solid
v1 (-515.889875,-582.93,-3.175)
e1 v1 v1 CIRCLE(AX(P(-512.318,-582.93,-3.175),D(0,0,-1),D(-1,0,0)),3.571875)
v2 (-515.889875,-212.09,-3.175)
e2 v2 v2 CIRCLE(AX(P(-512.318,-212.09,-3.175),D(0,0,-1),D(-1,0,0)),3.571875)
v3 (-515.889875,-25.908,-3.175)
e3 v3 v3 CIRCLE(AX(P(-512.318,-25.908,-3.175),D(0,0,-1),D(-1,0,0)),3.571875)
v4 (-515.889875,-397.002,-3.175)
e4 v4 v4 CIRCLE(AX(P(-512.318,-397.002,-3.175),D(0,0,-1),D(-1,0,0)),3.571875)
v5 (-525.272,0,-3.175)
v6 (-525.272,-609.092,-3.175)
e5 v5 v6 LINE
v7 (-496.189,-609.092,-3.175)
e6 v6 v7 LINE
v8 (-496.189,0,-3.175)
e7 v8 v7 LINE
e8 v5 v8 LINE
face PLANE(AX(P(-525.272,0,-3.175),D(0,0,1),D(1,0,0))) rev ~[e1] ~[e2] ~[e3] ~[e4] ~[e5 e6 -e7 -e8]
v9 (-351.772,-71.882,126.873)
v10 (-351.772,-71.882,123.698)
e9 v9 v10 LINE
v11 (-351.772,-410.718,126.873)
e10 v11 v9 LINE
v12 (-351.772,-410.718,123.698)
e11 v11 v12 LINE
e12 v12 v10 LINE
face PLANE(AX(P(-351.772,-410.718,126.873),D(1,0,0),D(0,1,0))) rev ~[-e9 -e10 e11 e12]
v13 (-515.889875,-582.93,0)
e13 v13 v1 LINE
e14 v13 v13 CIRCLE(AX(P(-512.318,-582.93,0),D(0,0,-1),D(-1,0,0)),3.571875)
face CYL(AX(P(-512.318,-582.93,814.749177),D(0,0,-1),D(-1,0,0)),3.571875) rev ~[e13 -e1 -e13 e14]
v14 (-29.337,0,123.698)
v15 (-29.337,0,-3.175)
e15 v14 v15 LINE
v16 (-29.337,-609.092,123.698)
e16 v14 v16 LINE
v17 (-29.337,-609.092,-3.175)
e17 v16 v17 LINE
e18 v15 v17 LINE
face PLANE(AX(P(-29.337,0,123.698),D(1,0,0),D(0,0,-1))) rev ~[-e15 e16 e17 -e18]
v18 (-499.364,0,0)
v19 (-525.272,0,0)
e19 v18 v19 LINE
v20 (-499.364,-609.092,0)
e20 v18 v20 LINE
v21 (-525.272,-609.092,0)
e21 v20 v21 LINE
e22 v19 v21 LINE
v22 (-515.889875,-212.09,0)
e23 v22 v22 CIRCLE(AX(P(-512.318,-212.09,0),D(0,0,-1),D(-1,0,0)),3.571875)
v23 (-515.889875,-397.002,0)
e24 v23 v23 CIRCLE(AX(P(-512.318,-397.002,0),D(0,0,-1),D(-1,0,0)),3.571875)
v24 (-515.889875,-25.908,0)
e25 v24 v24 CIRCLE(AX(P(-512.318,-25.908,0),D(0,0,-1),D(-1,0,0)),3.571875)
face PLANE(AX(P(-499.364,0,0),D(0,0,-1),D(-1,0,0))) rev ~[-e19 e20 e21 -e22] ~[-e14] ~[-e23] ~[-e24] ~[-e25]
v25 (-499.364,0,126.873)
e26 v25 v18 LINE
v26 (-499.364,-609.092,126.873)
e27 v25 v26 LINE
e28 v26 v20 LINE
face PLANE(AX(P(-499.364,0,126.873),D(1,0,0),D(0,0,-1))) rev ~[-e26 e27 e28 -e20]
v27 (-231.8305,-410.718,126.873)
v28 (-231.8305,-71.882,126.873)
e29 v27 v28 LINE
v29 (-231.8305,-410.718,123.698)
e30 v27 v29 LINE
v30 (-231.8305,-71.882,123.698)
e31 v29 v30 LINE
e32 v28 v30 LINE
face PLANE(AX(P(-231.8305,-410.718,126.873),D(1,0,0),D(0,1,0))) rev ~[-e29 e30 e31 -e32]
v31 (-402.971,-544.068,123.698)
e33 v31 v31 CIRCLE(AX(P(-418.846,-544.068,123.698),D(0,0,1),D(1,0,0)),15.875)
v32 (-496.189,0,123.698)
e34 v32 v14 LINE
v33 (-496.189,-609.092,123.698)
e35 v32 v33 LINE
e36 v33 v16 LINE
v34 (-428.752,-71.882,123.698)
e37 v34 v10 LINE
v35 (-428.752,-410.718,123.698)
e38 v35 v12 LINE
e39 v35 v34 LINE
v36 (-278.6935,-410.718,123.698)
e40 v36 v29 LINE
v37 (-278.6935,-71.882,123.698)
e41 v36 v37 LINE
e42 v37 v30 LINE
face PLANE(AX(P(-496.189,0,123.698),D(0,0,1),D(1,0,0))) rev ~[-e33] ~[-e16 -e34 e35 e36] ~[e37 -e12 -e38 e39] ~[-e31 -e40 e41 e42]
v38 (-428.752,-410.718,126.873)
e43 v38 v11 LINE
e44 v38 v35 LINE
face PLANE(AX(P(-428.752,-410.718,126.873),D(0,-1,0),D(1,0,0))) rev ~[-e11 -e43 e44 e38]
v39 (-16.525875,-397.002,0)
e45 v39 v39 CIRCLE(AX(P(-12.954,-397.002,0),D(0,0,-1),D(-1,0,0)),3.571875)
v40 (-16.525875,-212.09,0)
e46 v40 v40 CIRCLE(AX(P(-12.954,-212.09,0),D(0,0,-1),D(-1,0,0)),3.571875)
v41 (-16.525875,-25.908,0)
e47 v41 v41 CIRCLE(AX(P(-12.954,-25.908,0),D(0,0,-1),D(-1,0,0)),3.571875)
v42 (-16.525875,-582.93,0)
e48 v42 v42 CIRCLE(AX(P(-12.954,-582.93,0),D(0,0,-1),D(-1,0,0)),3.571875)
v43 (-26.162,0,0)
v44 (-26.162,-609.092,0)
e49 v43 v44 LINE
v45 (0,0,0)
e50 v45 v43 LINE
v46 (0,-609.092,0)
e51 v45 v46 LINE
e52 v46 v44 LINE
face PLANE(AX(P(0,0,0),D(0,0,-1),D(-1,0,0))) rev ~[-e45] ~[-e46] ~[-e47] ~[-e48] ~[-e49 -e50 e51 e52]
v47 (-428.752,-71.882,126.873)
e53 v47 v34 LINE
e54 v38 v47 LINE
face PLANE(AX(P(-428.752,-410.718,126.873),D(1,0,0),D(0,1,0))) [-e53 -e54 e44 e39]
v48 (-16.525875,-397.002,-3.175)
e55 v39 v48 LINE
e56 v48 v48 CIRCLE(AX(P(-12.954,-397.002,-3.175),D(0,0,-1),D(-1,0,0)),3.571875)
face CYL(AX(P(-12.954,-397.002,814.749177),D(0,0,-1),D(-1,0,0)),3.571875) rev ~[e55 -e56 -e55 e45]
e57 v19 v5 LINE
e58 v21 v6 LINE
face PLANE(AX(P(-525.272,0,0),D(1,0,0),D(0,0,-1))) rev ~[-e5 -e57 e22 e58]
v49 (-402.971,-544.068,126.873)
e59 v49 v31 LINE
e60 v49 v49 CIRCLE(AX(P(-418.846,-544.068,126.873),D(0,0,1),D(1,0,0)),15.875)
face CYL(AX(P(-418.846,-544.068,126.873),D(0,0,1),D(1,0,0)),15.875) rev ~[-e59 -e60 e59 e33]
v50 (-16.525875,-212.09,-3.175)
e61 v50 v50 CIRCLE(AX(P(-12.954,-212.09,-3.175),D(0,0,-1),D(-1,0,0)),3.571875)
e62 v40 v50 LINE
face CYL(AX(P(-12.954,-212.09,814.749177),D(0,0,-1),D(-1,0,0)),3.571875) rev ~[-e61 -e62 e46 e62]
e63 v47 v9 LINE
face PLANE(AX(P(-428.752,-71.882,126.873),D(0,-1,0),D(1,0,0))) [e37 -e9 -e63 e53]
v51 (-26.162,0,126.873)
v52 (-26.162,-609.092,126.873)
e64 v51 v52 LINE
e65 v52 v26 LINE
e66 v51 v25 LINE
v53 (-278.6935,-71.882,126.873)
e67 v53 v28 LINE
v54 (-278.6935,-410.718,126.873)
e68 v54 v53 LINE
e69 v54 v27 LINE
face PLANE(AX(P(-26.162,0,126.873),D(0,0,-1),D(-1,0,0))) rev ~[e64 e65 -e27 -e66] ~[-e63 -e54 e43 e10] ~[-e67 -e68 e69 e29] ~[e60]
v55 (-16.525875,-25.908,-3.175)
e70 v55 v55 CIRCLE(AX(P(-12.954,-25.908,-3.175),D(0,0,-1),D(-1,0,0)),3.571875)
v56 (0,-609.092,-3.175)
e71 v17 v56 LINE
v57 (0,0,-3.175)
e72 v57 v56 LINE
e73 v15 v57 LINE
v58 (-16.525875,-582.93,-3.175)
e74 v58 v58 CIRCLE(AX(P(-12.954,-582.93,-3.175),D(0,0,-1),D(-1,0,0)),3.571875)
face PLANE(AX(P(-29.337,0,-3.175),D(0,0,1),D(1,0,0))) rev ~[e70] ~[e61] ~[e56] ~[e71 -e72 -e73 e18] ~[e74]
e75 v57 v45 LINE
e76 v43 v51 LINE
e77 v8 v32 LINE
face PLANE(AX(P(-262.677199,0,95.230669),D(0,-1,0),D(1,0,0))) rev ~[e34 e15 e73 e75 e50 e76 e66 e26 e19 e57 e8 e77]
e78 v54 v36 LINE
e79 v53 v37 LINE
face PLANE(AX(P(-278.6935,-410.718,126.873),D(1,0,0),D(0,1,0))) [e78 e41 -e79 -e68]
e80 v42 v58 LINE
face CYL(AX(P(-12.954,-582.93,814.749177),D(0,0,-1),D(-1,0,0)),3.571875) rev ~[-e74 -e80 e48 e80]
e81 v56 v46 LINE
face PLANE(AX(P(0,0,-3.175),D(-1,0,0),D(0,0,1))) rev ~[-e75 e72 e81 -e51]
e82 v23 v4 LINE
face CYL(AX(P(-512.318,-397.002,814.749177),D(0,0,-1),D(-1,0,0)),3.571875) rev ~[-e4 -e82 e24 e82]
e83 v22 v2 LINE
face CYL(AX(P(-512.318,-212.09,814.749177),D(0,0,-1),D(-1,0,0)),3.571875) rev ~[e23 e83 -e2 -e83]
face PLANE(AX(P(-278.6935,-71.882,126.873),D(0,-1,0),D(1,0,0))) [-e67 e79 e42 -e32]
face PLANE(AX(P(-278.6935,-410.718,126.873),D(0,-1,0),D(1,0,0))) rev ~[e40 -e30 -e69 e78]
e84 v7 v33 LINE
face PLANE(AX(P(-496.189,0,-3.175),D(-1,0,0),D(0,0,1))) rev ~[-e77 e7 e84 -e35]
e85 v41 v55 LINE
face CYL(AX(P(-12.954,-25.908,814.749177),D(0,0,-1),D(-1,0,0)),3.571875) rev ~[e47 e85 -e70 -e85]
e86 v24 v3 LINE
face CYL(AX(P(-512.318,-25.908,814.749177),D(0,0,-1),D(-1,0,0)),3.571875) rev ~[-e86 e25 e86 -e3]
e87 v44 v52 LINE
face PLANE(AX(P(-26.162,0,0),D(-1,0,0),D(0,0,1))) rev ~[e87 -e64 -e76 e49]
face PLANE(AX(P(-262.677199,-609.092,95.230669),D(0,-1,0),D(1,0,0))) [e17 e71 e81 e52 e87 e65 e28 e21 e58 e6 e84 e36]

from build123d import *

# Parameters (mm, degrees)
F1_DEPTH = 609.092
F3_W     = 76.98
F3_H     = 338.836
F3_W_2   = 46.863
F4_DEPTH = 25.4
F6_R     = 15.875
F7_DEPTH = 25.4
F8_D     = 7.14375


# Not quite as in the source:
# - a length typed as a fraction of an inch, garbled in the dataset ("3 / 203.2 mm" for 3/8 in), is restored


with BuildPart() as f1:
    # F0 (on Front) → F1 (new body)
    with BuildSketch(Plane.XZ):
        Polygon((0, -3.175), (0, 0), (-26.162, 0), (-26.162, 126.873), (-499.364, 126.873), (-499.364, 0), (-525.272, 0), (-525.272, -3.175), (-496.189, -3.175), (-496.189, 123.698), (-29.337, 123.698), (-29.337, -3.175), align=None)
    extrude(amount=F1_DEPTH)

    # F3 (on face) → F4 (cut)
    with BuildSketch(Plane.XY.offset(126.873)):
        with Locations((-390.262, -241.3)):
            Rectangle(F3_W, F3_H)
        with Locations((-255.262, -241.3)):
            Rectangle(F3_W_2, F3_H)
    extrude(amount=-F4_DEPTH, mode=Mode.SUBTRACT)

    # F6 (on face) → F7 (cut)
    with BuildSketch(Plane.XY.offset(126.873)):
        with Locations((-418.846, -544.068)):
            Circle(F6_R)
    extrude(amount=-F7_DEPTH, mode=Mode.SUBTRACT)

    # F8 (through all)
    with Locations(Plane.XY):
        with Locations((-512.318, -25.908), (-512.318, -212.09), (-512.318, -397.002), (-512.318, -582.93), (-12.954, -582.93), (-12.954, -397.002), (-12.954, -212.09), (-12.954, -25.908)):
            Hole(F8_D / 2)


solid = f1.part
